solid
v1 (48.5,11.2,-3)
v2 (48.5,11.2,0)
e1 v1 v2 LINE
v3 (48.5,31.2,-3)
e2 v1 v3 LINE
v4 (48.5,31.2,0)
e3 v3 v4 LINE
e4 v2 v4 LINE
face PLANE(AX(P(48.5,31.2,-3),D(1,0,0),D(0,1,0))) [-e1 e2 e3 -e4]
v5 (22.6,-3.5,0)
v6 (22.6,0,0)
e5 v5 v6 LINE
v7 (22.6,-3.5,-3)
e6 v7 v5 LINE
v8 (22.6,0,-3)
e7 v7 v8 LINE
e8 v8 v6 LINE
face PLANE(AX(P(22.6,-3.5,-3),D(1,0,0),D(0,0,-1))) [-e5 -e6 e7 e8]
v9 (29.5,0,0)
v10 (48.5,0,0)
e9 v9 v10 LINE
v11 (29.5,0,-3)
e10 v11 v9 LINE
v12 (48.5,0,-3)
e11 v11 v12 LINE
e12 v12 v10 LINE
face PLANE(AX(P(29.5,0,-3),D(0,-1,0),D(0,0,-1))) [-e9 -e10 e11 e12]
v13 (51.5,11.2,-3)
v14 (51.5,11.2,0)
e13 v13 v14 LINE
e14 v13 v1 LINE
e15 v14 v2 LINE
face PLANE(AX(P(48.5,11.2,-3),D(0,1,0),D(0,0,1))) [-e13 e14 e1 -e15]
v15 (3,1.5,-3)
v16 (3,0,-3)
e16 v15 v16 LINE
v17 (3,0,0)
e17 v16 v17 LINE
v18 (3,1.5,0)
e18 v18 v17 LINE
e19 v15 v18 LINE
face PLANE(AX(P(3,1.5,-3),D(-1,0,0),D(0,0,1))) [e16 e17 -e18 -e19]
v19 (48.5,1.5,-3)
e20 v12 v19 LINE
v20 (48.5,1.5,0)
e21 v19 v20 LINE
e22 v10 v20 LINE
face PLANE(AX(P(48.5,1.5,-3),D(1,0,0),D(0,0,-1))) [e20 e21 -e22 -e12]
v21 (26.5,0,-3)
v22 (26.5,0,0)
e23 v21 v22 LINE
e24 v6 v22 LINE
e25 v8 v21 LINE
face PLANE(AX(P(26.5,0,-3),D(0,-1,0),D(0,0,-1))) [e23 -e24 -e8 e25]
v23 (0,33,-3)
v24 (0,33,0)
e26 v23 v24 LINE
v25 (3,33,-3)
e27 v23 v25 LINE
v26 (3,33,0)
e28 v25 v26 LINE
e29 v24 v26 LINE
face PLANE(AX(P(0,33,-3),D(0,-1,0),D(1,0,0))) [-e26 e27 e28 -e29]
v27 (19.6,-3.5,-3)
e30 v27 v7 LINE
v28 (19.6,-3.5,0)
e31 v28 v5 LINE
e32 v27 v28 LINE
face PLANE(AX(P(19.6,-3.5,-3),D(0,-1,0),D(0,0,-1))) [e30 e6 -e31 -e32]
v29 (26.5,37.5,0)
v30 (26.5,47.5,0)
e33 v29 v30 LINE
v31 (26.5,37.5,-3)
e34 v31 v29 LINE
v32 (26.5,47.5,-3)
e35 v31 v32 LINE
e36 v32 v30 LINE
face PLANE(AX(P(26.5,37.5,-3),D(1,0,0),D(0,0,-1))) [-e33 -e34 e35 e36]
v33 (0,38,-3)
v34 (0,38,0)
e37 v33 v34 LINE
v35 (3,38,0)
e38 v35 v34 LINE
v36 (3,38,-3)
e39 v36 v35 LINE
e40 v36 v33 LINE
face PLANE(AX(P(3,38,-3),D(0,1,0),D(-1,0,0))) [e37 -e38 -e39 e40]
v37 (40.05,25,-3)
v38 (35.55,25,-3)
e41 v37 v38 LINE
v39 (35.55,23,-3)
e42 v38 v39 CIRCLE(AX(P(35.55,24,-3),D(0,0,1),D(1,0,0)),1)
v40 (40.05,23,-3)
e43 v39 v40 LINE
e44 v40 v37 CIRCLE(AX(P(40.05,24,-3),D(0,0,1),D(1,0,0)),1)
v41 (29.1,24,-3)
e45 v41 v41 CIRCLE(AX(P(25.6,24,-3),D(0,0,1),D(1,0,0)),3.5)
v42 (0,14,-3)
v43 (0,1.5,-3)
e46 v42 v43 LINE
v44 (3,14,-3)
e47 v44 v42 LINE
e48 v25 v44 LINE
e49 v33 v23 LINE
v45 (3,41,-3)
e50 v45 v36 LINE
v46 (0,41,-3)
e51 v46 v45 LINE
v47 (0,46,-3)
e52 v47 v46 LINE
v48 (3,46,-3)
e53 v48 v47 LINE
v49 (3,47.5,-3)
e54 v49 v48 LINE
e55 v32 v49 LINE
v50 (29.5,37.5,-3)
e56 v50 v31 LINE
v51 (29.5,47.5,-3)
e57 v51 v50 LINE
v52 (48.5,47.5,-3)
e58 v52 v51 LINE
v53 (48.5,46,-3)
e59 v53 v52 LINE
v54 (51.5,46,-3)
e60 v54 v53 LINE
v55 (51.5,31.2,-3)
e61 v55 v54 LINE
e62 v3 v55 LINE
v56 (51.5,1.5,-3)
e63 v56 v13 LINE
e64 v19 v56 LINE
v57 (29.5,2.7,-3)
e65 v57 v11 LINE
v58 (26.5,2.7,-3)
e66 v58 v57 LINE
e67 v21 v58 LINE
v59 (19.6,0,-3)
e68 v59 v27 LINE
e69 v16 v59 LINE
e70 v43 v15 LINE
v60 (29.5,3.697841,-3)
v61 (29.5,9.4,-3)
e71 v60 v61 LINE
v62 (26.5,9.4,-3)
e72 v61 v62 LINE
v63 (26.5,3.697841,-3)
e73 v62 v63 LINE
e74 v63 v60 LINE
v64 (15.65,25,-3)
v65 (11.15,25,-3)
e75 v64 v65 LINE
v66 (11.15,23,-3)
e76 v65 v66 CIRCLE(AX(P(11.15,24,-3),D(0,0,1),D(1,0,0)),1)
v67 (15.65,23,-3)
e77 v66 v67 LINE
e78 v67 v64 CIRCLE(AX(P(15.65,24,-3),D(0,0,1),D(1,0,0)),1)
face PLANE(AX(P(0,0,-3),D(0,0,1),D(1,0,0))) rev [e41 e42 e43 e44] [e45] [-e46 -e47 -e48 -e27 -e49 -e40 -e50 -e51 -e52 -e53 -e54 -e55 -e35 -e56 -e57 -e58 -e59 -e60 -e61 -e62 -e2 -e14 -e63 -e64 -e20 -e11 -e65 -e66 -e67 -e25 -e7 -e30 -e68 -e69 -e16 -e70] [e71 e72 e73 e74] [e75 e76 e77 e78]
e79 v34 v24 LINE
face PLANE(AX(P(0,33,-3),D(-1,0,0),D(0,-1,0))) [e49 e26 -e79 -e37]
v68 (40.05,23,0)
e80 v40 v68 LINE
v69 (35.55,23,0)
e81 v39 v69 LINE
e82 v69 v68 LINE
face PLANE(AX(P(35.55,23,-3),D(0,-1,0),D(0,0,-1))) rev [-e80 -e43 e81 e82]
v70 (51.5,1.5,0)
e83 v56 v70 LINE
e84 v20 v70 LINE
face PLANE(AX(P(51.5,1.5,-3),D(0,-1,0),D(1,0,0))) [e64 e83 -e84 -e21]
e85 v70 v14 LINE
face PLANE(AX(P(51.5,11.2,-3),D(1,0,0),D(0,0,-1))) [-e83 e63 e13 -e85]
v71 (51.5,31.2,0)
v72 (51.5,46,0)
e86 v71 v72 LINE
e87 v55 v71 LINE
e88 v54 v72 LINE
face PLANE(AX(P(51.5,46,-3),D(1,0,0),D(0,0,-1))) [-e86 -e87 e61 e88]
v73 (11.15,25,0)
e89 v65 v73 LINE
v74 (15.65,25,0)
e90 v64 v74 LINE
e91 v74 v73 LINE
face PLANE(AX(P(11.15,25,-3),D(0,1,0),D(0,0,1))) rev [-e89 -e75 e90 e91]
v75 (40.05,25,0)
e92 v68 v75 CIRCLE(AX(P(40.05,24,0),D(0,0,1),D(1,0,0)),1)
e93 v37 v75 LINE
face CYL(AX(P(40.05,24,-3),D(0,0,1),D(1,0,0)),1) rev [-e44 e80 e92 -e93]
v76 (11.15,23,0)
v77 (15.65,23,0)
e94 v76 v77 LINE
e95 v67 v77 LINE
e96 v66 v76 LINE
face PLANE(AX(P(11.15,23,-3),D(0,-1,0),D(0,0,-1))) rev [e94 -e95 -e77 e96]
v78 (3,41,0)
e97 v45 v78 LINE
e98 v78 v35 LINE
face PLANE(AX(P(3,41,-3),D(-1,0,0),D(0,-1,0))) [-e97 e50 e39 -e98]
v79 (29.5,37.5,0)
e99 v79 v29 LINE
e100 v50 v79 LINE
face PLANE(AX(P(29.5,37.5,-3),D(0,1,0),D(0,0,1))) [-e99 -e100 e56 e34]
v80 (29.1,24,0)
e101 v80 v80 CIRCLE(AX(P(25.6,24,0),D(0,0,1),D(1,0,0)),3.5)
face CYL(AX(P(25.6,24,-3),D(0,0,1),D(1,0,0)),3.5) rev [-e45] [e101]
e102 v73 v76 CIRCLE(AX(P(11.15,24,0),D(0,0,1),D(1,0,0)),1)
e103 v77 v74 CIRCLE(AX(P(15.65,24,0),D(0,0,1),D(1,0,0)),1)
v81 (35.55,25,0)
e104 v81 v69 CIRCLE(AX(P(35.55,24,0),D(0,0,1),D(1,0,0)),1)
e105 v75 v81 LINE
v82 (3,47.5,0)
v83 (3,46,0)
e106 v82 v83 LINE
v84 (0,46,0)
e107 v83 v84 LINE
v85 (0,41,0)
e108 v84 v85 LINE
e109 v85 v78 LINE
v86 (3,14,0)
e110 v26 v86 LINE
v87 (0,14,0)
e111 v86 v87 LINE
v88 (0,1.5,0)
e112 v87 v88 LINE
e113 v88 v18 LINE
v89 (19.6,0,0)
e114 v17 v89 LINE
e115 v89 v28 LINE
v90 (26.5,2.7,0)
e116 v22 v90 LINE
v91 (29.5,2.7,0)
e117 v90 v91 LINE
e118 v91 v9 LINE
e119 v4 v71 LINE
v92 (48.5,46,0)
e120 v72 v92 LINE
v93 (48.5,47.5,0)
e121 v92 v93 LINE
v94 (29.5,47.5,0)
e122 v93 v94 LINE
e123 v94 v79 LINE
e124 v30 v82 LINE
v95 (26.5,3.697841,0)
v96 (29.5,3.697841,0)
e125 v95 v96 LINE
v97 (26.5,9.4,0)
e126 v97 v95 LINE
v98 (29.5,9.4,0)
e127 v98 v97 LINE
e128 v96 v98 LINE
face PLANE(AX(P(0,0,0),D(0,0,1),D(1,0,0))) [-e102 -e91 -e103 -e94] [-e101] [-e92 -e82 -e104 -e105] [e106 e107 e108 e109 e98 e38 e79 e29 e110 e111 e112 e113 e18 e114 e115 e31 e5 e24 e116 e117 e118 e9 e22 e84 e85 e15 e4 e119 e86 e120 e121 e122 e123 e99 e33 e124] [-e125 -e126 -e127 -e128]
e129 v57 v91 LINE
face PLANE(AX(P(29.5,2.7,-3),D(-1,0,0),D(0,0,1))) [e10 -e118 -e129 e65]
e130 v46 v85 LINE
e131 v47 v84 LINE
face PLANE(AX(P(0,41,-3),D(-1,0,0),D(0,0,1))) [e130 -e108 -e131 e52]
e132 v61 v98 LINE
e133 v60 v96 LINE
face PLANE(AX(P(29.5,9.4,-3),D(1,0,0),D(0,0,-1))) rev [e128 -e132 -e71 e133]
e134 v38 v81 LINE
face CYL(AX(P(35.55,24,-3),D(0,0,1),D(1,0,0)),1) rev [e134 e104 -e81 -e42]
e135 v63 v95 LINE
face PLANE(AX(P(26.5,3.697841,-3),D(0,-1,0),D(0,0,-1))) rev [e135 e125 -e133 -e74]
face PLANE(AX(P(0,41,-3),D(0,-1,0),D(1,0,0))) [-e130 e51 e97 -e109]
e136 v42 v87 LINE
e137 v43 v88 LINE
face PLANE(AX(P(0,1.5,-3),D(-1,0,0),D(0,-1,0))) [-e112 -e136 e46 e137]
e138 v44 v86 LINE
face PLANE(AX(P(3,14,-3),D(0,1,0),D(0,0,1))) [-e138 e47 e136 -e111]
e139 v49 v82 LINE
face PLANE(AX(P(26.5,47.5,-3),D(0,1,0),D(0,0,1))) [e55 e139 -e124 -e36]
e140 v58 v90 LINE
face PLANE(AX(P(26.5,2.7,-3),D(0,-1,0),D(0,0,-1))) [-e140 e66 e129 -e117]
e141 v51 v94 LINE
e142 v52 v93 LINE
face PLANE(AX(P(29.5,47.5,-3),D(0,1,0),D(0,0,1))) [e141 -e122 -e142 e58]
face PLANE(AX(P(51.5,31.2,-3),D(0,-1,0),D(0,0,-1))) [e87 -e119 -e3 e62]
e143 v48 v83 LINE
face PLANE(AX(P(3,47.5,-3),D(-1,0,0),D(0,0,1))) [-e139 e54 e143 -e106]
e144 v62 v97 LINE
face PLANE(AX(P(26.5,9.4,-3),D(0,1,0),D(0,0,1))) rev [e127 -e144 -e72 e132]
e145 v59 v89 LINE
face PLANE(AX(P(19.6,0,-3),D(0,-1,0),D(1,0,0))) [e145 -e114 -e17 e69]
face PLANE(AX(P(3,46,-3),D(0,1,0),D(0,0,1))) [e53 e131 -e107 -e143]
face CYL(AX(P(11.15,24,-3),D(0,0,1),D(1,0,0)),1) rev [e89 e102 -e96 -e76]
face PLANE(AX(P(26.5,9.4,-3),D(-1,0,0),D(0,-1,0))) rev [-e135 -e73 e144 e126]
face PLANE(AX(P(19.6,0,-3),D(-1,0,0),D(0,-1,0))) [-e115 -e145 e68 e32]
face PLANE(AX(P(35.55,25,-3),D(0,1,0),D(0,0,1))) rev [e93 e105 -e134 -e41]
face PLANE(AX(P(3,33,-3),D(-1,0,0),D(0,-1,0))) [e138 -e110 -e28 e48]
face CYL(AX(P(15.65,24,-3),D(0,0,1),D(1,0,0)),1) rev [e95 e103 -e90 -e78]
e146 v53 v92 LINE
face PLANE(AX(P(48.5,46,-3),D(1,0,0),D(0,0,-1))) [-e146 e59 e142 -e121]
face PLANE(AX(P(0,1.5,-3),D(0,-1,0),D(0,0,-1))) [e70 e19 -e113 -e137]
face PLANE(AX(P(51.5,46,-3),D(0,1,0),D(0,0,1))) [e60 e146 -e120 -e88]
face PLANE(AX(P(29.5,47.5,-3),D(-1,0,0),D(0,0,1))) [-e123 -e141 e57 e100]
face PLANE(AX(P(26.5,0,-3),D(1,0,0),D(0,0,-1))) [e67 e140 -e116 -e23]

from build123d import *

# Parameters (mm, degrees)
ESQUISSE1_R               = 3.5
ESQUISSE1_W               = 3
ESQUISSE1_H               = 5.702159315
T_LE_DE_BASE_PLI_E1_DEPTH = 3


# Sheet-metal steps are written as plain solids
with BuildPart() as part:
    # Esquisse1 → Tôle de base pliée1 (new body)
    with BuildSketch(Plane.XY):
        Polygon((29.5, 47.5), (29.5, 37.5), (26.5, 37.5), (26.5, 47.5), (3, 47.5), (3, 46), (0, 46), (0, 41), (3, 41), (3, 38), (0, 38), (0, 33), (3, 33), (3, 14), (0, 14), (0, 1.5), (3, 1.5), (3, 0), (19.6, 0), (19.6, -3.5), (22.6, -3.5), (22.6, 0), (26.5, 0), (26.5, 2.7), (29.5, 2.7), (29.5, 0), (48.5, 0), (48.5, 1.5), (51.5, 1.5), (51.5, 11.2), (48.5, 11.2), (48.5, 31.2), (51.5, 31.2), (51.5, 46), (48.5, 46), (48.5, 47.5), align=None)
        with Locations((25.6, 24)):
            Circle(ESQUISSE1_R, mode=Mode.SUBTRACT)
        with BuildLine():
            Line((35.55, 25), (40.05, 25))
            ThreePointArc((40.05, 25), (41.05, 24), (40.05, 23))
            Line((40.05, 23), (35.55, 23))
            ThreePointArc((35.55, 23), (34.55, 24), (35.55, 25))
        make_face(mode=Mode.SUBTRACT)
        with BuildLine():
            Line((11.15, 25), (15.65, 25))
            ThreePointArc((15.65, 25), (16.65, 24), (15.65, 23))
            Line((15.65, 23), (11.15, 23))
            ThreePointArc((11.15, 23), (10.15, 24), (11.15, 25))
        make_face(mode=Mode.SUBTRACT)
        with Locations((28, 6.548920343)):
            Rectangle(ESQUISSE1_W, ESQUISSE1_H, mode=Mode.SUBTRACT)
    extrude(amount=-T_LE_DE_BASE_PLI_E1_DEPTH)


solid = part.part
